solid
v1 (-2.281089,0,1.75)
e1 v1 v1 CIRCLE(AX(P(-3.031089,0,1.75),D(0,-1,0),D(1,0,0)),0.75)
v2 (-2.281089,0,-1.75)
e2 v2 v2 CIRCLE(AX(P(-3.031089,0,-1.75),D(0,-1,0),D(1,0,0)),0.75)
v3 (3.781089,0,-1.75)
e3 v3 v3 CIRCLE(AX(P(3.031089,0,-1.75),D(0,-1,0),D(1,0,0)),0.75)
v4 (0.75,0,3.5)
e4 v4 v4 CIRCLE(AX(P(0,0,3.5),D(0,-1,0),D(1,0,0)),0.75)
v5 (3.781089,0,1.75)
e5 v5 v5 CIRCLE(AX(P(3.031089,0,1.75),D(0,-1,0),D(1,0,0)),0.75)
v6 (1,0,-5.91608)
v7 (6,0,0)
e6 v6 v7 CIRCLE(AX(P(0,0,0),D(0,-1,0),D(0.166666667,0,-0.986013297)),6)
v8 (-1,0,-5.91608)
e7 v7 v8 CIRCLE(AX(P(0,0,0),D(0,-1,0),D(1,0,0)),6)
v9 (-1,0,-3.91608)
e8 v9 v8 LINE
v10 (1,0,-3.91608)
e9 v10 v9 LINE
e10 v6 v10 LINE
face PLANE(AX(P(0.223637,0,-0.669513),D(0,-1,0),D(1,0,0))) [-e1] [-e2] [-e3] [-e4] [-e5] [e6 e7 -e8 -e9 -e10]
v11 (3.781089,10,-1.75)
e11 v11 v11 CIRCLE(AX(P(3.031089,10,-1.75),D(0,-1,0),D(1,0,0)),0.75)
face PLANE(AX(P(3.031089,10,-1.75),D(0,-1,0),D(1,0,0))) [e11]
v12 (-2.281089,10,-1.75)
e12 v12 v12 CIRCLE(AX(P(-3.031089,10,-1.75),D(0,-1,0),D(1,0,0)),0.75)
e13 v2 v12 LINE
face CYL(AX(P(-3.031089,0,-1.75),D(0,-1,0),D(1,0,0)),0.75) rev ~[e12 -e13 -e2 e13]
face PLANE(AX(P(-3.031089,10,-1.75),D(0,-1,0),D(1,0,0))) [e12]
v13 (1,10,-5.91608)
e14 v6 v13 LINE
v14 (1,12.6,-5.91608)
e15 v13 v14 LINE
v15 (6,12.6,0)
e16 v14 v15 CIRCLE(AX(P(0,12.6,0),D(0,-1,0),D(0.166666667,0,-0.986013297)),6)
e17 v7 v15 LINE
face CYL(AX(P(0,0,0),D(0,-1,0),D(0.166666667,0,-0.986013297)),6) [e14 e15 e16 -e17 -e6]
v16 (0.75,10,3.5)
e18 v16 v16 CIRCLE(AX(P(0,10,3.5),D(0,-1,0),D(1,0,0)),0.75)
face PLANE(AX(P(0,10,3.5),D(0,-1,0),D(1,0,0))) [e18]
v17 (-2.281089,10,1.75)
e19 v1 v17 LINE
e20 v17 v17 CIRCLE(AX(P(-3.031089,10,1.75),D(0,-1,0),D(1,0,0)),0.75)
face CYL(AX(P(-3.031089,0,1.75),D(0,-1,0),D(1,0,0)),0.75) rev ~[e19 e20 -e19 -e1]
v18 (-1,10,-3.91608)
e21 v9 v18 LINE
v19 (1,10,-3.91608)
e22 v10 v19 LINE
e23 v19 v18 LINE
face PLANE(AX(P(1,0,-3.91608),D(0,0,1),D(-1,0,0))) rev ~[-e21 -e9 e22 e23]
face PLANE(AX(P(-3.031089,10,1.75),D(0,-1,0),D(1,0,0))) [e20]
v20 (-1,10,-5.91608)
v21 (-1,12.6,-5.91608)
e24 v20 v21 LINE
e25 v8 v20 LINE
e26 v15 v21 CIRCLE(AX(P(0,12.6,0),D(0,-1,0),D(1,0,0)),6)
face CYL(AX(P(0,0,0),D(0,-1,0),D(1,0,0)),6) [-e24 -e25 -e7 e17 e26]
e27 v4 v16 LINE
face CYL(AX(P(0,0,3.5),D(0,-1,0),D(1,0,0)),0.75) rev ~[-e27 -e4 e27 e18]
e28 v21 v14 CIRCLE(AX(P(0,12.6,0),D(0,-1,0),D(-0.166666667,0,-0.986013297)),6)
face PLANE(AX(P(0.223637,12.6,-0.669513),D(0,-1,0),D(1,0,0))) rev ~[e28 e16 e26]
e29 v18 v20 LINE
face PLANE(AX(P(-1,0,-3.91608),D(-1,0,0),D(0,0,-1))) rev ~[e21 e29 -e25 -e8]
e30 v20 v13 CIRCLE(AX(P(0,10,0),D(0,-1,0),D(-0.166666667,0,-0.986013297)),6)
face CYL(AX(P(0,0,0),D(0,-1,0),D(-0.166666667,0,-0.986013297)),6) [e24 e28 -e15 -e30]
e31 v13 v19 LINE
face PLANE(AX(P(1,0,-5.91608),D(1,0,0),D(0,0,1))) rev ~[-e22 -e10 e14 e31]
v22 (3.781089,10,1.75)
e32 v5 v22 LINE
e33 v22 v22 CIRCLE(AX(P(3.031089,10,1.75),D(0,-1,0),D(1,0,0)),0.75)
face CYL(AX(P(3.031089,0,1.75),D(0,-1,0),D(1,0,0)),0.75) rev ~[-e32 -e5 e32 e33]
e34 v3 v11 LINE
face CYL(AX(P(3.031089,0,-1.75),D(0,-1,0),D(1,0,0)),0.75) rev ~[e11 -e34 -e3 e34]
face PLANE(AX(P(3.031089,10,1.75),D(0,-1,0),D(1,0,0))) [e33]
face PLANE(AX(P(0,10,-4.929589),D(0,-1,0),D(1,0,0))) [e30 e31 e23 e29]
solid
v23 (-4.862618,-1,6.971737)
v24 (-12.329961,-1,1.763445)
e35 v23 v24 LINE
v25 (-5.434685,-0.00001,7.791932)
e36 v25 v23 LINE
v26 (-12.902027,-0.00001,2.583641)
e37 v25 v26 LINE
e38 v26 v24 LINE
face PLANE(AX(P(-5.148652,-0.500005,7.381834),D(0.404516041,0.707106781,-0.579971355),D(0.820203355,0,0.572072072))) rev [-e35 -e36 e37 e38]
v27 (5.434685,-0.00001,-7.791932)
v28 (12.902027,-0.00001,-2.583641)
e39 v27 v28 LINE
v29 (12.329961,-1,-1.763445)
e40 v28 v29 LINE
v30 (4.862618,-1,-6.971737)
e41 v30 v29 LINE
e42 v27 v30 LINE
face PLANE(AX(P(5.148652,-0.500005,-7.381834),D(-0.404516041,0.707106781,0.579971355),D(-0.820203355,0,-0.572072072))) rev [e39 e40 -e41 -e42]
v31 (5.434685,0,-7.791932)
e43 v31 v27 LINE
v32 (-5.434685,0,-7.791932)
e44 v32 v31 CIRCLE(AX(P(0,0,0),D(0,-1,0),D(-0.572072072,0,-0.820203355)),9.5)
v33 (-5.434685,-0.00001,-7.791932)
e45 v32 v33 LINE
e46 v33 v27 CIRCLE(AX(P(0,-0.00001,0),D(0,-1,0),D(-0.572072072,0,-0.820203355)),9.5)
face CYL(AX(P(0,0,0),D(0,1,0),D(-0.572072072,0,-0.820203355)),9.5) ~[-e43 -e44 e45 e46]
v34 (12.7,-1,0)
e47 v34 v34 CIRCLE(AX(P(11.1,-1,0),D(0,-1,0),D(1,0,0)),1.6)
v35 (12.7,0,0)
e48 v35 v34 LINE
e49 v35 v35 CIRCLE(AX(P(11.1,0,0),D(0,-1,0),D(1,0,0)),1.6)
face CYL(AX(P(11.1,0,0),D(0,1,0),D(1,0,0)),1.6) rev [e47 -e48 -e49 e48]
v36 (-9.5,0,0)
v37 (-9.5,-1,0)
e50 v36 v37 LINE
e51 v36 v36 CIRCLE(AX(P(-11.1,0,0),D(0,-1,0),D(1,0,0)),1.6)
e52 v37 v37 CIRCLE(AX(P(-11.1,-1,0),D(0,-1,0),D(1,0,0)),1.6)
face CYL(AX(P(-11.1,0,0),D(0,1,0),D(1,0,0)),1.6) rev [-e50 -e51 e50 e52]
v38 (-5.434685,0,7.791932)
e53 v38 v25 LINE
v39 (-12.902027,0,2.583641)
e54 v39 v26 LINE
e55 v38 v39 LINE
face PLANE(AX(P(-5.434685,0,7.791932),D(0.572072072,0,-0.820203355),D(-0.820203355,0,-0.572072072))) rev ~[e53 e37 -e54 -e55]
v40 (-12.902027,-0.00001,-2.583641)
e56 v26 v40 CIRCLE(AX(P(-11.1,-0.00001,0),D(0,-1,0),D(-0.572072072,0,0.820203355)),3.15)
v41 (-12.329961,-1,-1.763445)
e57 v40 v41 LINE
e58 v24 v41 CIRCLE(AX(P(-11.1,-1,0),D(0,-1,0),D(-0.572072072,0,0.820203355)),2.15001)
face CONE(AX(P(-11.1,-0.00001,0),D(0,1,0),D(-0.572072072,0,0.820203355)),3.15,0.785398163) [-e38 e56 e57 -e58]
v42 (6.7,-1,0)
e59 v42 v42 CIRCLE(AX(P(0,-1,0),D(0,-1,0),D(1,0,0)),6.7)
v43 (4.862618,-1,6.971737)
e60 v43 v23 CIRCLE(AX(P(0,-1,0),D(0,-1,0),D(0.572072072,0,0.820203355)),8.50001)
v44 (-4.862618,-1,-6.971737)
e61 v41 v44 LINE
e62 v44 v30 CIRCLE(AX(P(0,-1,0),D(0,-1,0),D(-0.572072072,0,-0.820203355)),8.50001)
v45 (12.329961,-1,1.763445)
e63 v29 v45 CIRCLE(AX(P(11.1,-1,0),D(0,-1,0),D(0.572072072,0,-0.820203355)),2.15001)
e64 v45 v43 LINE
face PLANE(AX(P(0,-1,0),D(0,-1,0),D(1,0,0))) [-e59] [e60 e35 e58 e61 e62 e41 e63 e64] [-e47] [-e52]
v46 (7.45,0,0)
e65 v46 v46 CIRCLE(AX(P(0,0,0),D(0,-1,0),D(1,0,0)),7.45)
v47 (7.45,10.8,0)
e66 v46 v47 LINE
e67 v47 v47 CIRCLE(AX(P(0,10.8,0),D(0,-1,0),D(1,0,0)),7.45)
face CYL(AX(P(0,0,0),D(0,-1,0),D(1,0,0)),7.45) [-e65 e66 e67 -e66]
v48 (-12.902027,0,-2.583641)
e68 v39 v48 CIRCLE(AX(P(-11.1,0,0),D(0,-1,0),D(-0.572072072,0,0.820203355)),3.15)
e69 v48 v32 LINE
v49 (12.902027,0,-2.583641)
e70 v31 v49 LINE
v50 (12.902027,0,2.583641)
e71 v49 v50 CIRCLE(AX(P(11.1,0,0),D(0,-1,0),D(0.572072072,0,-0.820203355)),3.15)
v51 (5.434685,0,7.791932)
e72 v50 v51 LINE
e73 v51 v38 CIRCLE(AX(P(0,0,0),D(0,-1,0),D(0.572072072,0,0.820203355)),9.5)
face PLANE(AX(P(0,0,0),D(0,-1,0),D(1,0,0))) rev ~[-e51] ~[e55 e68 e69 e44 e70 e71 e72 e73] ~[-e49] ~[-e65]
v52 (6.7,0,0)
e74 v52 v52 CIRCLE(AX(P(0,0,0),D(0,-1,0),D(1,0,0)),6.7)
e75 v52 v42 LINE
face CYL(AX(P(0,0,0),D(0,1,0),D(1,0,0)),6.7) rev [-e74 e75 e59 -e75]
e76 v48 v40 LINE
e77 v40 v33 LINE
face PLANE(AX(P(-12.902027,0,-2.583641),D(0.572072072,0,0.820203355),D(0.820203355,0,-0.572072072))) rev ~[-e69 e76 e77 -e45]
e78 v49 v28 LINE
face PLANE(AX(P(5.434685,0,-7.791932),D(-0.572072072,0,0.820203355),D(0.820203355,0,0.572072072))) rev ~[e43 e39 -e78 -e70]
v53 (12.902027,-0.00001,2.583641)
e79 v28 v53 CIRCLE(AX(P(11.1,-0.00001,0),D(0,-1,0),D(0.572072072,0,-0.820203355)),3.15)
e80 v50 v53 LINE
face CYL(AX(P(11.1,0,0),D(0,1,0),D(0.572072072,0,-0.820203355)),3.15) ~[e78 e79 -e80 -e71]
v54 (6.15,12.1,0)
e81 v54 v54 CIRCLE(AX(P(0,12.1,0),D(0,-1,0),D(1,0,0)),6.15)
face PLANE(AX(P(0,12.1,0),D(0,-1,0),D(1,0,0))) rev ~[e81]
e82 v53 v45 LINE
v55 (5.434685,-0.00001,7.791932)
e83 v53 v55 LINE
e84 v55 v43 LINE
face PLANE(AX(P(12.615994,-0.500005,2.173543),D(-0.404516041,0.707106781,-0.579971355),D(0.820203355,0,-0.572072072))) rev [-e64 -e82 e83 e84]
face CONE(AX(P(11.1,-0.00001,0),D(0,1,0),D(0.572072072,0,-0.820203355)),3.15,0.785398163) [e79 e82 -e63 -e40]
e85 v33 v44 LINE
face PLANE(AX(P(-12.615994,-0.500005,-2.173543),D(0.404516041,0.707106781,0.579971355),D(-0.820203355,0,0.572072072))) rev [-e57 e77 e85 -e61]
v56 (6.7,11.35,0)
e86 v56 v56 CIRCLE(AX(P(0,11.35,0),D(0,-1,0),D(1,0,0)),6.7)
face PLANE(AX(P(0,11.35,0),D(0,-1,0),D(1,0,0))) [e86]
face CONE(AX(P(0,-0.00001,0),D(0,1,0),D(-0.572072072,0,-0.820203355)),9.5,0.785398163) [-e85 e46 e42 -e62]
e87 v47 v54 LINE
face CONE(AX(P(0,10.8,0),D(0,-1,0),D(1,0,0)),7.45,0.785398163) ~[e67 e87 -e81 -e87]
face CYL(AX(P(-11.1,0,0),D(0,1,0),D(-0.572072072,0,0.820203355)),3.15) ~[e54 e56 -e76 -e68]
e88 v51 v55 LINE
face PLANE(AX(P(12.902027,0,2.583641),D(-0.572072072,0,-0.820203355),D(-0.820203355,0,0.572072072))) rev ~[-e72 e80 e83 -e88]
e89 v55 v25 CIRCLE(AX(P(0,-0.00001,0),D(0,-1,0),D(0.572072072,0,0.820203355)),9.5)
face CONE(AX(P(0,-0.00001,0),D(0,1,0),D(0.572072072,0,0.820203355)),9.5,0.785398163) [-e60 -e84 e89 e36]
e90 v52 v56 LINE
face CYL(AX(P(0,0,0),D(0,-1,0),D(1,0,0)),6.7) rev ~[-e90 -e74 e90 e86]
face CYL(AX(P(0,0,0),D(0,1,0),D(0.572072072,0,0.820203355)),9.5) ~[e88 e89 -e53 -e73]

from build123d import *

# Parameters (mm, degrees)
F0_R     = 1.6
F0_R_2   = 7.45
F0_R_3   = 6.7
F1_DEPTH = 1
F2_SIZE  = 0.99999
F0_R_4   = 0.75
F3_DEPTH = 12.1
F4_T     = 0.75
F5_DEPTH = 12.6
F6_DEPTH = 10
F7_SIZE  = 1.3


# Not quite as in the source:
# - a fillet or chamfer is up to 0.001 mm smaller than in the source, because OpenCascade refuses the exact size
# - a shell that OpenCascade refuses in one call is made with other operations: the cavity is built on its own and cut out
# - a feature names something its author has since deleted; it is built from what else it names


with BuildPart() as f1:
    # F0 (on Front) → F1 (new body)
    with BuildSketch(Plane.XZ):
        with BuildLine():
            Line((-5.4346846847, 7.7919318771), (-12.902027027, 2.5836405698))
            ThreePointArc((-12.902027027, 2.5836405698), (-14.25, 0), (-12.902027027, -2.5836405698))
            Line((-12.902027027, -2.5836405698), (-5.4346846847, -7.7919318771))
            ThreePointArc((-5.4346846847, -7.7919318771), (0, -9.5), (5.4346846847, -7.7919318771))
            Line((5.4346846847, -7.7919318771), (12.902027027, -2.5836405698))
            ThreePointArc((12.902027027, -2.5836405698), (14.25, 0), (12.902027027, 2.5836405698))
            Line((12.902027027, 2.5836405698), (5.4346846847, 7.7919318771))
            ThreePointArc((5.4346846847, 7.7919318771), (0, 9.5), (-5.4346846847, 7.7919318771))
        make_face()
        with Locations((-11.1, 0)):
            Circle(F0_R, mode=Mode.SUBTRACT)
        Circle(F0_R_2, mode=Mode.SUBTRACT)
        with Locations((11.1, 0)):
            Circle(F0_R, mode=Mode.SUBTRACT)
        Circle(F0_R_2)
        Circle(F0_R_3, mode=Mode.SUBTRACT)
    extrude(amount=F1_DEPTH)

    # F2 (size 1 in the source; OpenCascade refuses exactly that, so slightly less here)
    f2_edges = [f1.edges().sort_by_distance(p)[0] for p in [
        (-9.168356, -1, 5.187786),
        (0, -1, 9.5),
        (-14.25, -1, 0),
        (-9.168356, -1, -5.187786),
        (0, -1, -9.5),
        (9.168356, -1, -5.187786),
        (14.25, -1, 0),
        (9.168356, -1, 5.187786),
    ]]
    chamfer(f2_edges, length=F2_SIZE)

    # F0 (on Front) → F3 (join)
    with BuildSketch(Plane.XZ):
        Circle(F0_R_2)
        Circle(F0_R_3, mode=Mode.SUBTRACT)
        Circle(F0_R_3)
        with BuildLine():
            ThreePointArc((-1, -5.9160797831), (-3.8729833462, 4.582575695), (6, 0))
            ThreePointArc((6, 0), (4.582575695, -3.8729833462), (1, -5.9160797831))
            Line((1, -5.9160797831), (1, -6.3300160691))
            Line((1, -6.3300160691), (-1, -6.3300160691))
            Line((-1, -6.3300160691), (-1, -5.9160797831))
        make_face(mode=Mode.SUBTRACT)
        with BuildLine():
            ThreePointArc((1, -5.9160797831), (4.582575695, -3.8729833462), (6, 0))
            ThreePointArc((6, 0), (-3.8729833462, 4.582575695), (-1, -5.9160797831))
            Line((-1, -5.9160797831), (-1, -3.9160797831))
            Line((-1, -3.9160797831), (0, -3.9160797831))
            Line((0, -3.9160797831), (1, -3.9160797831))
            Line((1, -3.9160797831), (1, -5.9160797831))
        make_face()
        with Locations((-3.0310889132, -1.75)):
            Circle(F0_R_4, mode=Mode.SUBTRACT)
        with Locations((3.0310889132, -1.75)):
            Circle(F0_R_4, mode=Mode.SUBTRACT)
        with Locations((-3.0310889132, 1.75)):
            Circle(F0_R_4, mode=Mode.SUBTRACT)
        with Locations((3.0310889132, 1.75)):
            Circle(F0_R_4, mode=Mode.SUBTRACT)
        with Locations((0, 3.5)):
            Circle(F0_R_4, mode=Mode.SUBTRACT)
        with Locations((-3.0310889132, -1.75)):
            Circle(F0_R_4)
        with BuildLine():
            Line((-1, -3.9160797831), (-1, -5.9160797831))
            ThreePointArc((-1, -5.9160797831), (0, -6), (1, -5.9160797831))
            Line((1, -5.9160797831), (1, -3.9160797831))
            Line((1, -3.9160797831), (0, -3.9160797831))
            Line((0, -3.9160797831), (-1, -3.9160797831))
        make_face()
        with BuildLine():
            ThreePointArc((1, -5.9160797831), (0, -6), (-1, -5.9160797831))
            Line((-1, -5.9160797831), (-1, -6.3300160691))
            Line((-1, -6.3300160691), (1, -6.3300160691))
            Line((1, -6.3300160691), (1, -5.9160797831))
        make_face()
        with Locations((-3.0310889132, 1.75)):
            Circle(F0_R_4)
        with Locations((0, 3.5)):
            Circle(F0_R_4)
        with Locations((3.0310889132, 1.75)):
            Circle(F0_R_4)
        with Locations((3.0310889132, -1.75)):
            Circle(F0_R_4)
    extrude(amount=-F3_DEPTH)

    # F4: shell of thickness 0.75, made by hand


with BuildPart() as f4_core1:
    # F4_t2: copy of F1
    add(f1.part)

    # the walls: a layer under each face that stays
    f4_faces = [f4_core1.faces().sort_by_distance(p)[0] for p in [
        (0, -5e-06, 9.5),
        (9.1683558559, -5e-06, 5.1877862235),
        (0, -0.500005, 9.000005),
        (-12.2142857143, 0, -2.7142857143),
        (-9.1683558559, -5e-06, 5.1877862235),
        (14.25, -5e-06, 0),
        (8.8823226802, -0.500005, 4.7776886467),
        (-8.83334, -1, 0),
        (-8.8823226802, -0.500005, 4.7776886467),
        (-14.25, -5e-06, 0),
        (9.1683558559, -5e-06, -5.1877862235),
        (-9.1683558559, -5e-06, -5.1877862235),
        (0, -5e-06, -9.5),
        (-12.7, -0.5, 0),
        (-7.45, 6.05, 0),
        (9.5, -0.5, 0),
        (13.750005, -0.500005, 0),
        (-13.750005, -0.500005, 0),
        (-8.8823226802, -0.500005, -4.7776886467),
        (0, -0.500005, -9.000005),
        (8.8823226802, -0.500005, -4.7776886467),
        (-6.7, -0.5, 0),
        (0, 12.1, 0),
    ]]
    thicken(f4_faces, amount=-F4_T, mode=Mode.SUBTRACT)

    # F4_s3 → F4_t4 (revolve, cut)
    with BuildSketch(Plane.XY):
        Polygon((7.4575, 0.0075), (7.45, -0.75), (6.7, -0.75), (6.7, 0), align=None)
    revolve(axis=Axis((0, 0, 0), (0, -1, 0)), mode=Mode.SUBTRACT)


with BuildPart() as f1_1:
    add(f1.part)

    # what is left inside the walls is the cavity
    f4_cavity = [f4_core1.part.solids().sort_by_distance(p)[0] for p in [
        (-6.6925, 7.566667, 0),
    ]]
    add(f4_cavity, mode=Mode.SUBTRACT)

    # F7
    f7_edges = [f1_1.edges().sort_by_distance(p)[0] for p in [
        (-7.45, 12.1, 0),
    ]]
    chamfer(f7_edges, length=F7_SIZE)


with BuildPart() as f5:
    # F0 (on Front) → F5 (new body)
    with BuildSketch(Plane.XZ):
        with BuildLine():
            ThreePointArc((1, -5.9160797831), (4.582575695, -3.8729833462), (6, 0))
            ThreePointArc((6, 0), (-3.8729833462, 4.582575695), (-1, -5.9160797831))
            Line((-1, -5.9160797831), (-1, -3.9160797831))
            Line((-1, -3.9160797831), (0, -3.9160797831))
            Line((0, -3.9160797831), (1, -3.9160797831))
            Line((1, -3.9160797831), (1, -5.9160797831))
        make_face()
        with Locations((-3.0310889132, -1.75)):
            Circle(F0_R_4, mode=Mode.SUBTRACT)
        with Locations((3.0310889132, -1.75)):
            Circle(F0_R_4, mode=Mode.SUBTRACT)
        with Locations((-3.0310889132, 1.75)):
            Circle(F0_R_4, mode=Mode.SUBTRACT)
        with Locations((3.0310889132, 1.75)):
            Circle(F0_R_4, mode=Mode.SUBTRACT)
        with Locations((0, 3.5)):
            Circle(F0_R_4, mode=Mode.SUBTRACT)
        with Locations((-3.0310889132, -1.75)):
            Circle(F0_R_4)
        with BuildLine():
            Line((-1, -3.9160797831), (-1, -5.9160797831))
            ThreePointArc((-1, -5.9160797831), (0, -6), (1, -5.9160797831))
            Line((1, -5.9160797831), (1, -3.9160797831))
            Line((1, -3.9160797831), (0, -3.9160797831))
            Line((0, -3.9160797831), (-1, -3.9160797831))
        make_face()
        with Locations((-3.0310889132, 1.75)):
            Circle(F0_R_4)
        with Locations((0, 3.5)):
            Circle(F0_R_4)
        with Locations((3.0310889132, 1.75)):
            Circle(F0_R_4)
        with Locations((3.0310889132, -1.75)):
            Circle(F0_R_4)
    extrude(amount=-F5_DEPTH)

    # F0 (on Front) → F6 (cut)
    with BuildSketch(Plane.XZ):
        with Locations((-3.0310889132, -1.75)):
            Circle(F0_R_4)
        with BuildLine():
            Line((-1, -3.9160797831), (-1, -5.9160797831))
            ThreePointArc((-1, -5.9160797831), (0, -6), (1, -5.9160797831))
            Line((1, -5.9160797831), (1, -3.9160797831))
            Line((1, -3.9160797831), (0, -3.9160797831))
            Line((0, -3.9160797831), (-1, -3.9160797831))
        make_face()
        with Locations((-3.0310889132, 1.75)):
            Circle(F0_R_4)
        with Locations((0, 3.5)):
            Circle(F0_R_4)
        with Locations((3.0310889132, 1.75)):
            Circle(F0_R_4)
        with Locations((3.0310889132, -1.75)):
            Circle(F0_R_4)
    extrude(amount=-F6_DEPTH, mode=Mode.SUBTRACT)


solid = Compound([f1_1.part, f5.part])
